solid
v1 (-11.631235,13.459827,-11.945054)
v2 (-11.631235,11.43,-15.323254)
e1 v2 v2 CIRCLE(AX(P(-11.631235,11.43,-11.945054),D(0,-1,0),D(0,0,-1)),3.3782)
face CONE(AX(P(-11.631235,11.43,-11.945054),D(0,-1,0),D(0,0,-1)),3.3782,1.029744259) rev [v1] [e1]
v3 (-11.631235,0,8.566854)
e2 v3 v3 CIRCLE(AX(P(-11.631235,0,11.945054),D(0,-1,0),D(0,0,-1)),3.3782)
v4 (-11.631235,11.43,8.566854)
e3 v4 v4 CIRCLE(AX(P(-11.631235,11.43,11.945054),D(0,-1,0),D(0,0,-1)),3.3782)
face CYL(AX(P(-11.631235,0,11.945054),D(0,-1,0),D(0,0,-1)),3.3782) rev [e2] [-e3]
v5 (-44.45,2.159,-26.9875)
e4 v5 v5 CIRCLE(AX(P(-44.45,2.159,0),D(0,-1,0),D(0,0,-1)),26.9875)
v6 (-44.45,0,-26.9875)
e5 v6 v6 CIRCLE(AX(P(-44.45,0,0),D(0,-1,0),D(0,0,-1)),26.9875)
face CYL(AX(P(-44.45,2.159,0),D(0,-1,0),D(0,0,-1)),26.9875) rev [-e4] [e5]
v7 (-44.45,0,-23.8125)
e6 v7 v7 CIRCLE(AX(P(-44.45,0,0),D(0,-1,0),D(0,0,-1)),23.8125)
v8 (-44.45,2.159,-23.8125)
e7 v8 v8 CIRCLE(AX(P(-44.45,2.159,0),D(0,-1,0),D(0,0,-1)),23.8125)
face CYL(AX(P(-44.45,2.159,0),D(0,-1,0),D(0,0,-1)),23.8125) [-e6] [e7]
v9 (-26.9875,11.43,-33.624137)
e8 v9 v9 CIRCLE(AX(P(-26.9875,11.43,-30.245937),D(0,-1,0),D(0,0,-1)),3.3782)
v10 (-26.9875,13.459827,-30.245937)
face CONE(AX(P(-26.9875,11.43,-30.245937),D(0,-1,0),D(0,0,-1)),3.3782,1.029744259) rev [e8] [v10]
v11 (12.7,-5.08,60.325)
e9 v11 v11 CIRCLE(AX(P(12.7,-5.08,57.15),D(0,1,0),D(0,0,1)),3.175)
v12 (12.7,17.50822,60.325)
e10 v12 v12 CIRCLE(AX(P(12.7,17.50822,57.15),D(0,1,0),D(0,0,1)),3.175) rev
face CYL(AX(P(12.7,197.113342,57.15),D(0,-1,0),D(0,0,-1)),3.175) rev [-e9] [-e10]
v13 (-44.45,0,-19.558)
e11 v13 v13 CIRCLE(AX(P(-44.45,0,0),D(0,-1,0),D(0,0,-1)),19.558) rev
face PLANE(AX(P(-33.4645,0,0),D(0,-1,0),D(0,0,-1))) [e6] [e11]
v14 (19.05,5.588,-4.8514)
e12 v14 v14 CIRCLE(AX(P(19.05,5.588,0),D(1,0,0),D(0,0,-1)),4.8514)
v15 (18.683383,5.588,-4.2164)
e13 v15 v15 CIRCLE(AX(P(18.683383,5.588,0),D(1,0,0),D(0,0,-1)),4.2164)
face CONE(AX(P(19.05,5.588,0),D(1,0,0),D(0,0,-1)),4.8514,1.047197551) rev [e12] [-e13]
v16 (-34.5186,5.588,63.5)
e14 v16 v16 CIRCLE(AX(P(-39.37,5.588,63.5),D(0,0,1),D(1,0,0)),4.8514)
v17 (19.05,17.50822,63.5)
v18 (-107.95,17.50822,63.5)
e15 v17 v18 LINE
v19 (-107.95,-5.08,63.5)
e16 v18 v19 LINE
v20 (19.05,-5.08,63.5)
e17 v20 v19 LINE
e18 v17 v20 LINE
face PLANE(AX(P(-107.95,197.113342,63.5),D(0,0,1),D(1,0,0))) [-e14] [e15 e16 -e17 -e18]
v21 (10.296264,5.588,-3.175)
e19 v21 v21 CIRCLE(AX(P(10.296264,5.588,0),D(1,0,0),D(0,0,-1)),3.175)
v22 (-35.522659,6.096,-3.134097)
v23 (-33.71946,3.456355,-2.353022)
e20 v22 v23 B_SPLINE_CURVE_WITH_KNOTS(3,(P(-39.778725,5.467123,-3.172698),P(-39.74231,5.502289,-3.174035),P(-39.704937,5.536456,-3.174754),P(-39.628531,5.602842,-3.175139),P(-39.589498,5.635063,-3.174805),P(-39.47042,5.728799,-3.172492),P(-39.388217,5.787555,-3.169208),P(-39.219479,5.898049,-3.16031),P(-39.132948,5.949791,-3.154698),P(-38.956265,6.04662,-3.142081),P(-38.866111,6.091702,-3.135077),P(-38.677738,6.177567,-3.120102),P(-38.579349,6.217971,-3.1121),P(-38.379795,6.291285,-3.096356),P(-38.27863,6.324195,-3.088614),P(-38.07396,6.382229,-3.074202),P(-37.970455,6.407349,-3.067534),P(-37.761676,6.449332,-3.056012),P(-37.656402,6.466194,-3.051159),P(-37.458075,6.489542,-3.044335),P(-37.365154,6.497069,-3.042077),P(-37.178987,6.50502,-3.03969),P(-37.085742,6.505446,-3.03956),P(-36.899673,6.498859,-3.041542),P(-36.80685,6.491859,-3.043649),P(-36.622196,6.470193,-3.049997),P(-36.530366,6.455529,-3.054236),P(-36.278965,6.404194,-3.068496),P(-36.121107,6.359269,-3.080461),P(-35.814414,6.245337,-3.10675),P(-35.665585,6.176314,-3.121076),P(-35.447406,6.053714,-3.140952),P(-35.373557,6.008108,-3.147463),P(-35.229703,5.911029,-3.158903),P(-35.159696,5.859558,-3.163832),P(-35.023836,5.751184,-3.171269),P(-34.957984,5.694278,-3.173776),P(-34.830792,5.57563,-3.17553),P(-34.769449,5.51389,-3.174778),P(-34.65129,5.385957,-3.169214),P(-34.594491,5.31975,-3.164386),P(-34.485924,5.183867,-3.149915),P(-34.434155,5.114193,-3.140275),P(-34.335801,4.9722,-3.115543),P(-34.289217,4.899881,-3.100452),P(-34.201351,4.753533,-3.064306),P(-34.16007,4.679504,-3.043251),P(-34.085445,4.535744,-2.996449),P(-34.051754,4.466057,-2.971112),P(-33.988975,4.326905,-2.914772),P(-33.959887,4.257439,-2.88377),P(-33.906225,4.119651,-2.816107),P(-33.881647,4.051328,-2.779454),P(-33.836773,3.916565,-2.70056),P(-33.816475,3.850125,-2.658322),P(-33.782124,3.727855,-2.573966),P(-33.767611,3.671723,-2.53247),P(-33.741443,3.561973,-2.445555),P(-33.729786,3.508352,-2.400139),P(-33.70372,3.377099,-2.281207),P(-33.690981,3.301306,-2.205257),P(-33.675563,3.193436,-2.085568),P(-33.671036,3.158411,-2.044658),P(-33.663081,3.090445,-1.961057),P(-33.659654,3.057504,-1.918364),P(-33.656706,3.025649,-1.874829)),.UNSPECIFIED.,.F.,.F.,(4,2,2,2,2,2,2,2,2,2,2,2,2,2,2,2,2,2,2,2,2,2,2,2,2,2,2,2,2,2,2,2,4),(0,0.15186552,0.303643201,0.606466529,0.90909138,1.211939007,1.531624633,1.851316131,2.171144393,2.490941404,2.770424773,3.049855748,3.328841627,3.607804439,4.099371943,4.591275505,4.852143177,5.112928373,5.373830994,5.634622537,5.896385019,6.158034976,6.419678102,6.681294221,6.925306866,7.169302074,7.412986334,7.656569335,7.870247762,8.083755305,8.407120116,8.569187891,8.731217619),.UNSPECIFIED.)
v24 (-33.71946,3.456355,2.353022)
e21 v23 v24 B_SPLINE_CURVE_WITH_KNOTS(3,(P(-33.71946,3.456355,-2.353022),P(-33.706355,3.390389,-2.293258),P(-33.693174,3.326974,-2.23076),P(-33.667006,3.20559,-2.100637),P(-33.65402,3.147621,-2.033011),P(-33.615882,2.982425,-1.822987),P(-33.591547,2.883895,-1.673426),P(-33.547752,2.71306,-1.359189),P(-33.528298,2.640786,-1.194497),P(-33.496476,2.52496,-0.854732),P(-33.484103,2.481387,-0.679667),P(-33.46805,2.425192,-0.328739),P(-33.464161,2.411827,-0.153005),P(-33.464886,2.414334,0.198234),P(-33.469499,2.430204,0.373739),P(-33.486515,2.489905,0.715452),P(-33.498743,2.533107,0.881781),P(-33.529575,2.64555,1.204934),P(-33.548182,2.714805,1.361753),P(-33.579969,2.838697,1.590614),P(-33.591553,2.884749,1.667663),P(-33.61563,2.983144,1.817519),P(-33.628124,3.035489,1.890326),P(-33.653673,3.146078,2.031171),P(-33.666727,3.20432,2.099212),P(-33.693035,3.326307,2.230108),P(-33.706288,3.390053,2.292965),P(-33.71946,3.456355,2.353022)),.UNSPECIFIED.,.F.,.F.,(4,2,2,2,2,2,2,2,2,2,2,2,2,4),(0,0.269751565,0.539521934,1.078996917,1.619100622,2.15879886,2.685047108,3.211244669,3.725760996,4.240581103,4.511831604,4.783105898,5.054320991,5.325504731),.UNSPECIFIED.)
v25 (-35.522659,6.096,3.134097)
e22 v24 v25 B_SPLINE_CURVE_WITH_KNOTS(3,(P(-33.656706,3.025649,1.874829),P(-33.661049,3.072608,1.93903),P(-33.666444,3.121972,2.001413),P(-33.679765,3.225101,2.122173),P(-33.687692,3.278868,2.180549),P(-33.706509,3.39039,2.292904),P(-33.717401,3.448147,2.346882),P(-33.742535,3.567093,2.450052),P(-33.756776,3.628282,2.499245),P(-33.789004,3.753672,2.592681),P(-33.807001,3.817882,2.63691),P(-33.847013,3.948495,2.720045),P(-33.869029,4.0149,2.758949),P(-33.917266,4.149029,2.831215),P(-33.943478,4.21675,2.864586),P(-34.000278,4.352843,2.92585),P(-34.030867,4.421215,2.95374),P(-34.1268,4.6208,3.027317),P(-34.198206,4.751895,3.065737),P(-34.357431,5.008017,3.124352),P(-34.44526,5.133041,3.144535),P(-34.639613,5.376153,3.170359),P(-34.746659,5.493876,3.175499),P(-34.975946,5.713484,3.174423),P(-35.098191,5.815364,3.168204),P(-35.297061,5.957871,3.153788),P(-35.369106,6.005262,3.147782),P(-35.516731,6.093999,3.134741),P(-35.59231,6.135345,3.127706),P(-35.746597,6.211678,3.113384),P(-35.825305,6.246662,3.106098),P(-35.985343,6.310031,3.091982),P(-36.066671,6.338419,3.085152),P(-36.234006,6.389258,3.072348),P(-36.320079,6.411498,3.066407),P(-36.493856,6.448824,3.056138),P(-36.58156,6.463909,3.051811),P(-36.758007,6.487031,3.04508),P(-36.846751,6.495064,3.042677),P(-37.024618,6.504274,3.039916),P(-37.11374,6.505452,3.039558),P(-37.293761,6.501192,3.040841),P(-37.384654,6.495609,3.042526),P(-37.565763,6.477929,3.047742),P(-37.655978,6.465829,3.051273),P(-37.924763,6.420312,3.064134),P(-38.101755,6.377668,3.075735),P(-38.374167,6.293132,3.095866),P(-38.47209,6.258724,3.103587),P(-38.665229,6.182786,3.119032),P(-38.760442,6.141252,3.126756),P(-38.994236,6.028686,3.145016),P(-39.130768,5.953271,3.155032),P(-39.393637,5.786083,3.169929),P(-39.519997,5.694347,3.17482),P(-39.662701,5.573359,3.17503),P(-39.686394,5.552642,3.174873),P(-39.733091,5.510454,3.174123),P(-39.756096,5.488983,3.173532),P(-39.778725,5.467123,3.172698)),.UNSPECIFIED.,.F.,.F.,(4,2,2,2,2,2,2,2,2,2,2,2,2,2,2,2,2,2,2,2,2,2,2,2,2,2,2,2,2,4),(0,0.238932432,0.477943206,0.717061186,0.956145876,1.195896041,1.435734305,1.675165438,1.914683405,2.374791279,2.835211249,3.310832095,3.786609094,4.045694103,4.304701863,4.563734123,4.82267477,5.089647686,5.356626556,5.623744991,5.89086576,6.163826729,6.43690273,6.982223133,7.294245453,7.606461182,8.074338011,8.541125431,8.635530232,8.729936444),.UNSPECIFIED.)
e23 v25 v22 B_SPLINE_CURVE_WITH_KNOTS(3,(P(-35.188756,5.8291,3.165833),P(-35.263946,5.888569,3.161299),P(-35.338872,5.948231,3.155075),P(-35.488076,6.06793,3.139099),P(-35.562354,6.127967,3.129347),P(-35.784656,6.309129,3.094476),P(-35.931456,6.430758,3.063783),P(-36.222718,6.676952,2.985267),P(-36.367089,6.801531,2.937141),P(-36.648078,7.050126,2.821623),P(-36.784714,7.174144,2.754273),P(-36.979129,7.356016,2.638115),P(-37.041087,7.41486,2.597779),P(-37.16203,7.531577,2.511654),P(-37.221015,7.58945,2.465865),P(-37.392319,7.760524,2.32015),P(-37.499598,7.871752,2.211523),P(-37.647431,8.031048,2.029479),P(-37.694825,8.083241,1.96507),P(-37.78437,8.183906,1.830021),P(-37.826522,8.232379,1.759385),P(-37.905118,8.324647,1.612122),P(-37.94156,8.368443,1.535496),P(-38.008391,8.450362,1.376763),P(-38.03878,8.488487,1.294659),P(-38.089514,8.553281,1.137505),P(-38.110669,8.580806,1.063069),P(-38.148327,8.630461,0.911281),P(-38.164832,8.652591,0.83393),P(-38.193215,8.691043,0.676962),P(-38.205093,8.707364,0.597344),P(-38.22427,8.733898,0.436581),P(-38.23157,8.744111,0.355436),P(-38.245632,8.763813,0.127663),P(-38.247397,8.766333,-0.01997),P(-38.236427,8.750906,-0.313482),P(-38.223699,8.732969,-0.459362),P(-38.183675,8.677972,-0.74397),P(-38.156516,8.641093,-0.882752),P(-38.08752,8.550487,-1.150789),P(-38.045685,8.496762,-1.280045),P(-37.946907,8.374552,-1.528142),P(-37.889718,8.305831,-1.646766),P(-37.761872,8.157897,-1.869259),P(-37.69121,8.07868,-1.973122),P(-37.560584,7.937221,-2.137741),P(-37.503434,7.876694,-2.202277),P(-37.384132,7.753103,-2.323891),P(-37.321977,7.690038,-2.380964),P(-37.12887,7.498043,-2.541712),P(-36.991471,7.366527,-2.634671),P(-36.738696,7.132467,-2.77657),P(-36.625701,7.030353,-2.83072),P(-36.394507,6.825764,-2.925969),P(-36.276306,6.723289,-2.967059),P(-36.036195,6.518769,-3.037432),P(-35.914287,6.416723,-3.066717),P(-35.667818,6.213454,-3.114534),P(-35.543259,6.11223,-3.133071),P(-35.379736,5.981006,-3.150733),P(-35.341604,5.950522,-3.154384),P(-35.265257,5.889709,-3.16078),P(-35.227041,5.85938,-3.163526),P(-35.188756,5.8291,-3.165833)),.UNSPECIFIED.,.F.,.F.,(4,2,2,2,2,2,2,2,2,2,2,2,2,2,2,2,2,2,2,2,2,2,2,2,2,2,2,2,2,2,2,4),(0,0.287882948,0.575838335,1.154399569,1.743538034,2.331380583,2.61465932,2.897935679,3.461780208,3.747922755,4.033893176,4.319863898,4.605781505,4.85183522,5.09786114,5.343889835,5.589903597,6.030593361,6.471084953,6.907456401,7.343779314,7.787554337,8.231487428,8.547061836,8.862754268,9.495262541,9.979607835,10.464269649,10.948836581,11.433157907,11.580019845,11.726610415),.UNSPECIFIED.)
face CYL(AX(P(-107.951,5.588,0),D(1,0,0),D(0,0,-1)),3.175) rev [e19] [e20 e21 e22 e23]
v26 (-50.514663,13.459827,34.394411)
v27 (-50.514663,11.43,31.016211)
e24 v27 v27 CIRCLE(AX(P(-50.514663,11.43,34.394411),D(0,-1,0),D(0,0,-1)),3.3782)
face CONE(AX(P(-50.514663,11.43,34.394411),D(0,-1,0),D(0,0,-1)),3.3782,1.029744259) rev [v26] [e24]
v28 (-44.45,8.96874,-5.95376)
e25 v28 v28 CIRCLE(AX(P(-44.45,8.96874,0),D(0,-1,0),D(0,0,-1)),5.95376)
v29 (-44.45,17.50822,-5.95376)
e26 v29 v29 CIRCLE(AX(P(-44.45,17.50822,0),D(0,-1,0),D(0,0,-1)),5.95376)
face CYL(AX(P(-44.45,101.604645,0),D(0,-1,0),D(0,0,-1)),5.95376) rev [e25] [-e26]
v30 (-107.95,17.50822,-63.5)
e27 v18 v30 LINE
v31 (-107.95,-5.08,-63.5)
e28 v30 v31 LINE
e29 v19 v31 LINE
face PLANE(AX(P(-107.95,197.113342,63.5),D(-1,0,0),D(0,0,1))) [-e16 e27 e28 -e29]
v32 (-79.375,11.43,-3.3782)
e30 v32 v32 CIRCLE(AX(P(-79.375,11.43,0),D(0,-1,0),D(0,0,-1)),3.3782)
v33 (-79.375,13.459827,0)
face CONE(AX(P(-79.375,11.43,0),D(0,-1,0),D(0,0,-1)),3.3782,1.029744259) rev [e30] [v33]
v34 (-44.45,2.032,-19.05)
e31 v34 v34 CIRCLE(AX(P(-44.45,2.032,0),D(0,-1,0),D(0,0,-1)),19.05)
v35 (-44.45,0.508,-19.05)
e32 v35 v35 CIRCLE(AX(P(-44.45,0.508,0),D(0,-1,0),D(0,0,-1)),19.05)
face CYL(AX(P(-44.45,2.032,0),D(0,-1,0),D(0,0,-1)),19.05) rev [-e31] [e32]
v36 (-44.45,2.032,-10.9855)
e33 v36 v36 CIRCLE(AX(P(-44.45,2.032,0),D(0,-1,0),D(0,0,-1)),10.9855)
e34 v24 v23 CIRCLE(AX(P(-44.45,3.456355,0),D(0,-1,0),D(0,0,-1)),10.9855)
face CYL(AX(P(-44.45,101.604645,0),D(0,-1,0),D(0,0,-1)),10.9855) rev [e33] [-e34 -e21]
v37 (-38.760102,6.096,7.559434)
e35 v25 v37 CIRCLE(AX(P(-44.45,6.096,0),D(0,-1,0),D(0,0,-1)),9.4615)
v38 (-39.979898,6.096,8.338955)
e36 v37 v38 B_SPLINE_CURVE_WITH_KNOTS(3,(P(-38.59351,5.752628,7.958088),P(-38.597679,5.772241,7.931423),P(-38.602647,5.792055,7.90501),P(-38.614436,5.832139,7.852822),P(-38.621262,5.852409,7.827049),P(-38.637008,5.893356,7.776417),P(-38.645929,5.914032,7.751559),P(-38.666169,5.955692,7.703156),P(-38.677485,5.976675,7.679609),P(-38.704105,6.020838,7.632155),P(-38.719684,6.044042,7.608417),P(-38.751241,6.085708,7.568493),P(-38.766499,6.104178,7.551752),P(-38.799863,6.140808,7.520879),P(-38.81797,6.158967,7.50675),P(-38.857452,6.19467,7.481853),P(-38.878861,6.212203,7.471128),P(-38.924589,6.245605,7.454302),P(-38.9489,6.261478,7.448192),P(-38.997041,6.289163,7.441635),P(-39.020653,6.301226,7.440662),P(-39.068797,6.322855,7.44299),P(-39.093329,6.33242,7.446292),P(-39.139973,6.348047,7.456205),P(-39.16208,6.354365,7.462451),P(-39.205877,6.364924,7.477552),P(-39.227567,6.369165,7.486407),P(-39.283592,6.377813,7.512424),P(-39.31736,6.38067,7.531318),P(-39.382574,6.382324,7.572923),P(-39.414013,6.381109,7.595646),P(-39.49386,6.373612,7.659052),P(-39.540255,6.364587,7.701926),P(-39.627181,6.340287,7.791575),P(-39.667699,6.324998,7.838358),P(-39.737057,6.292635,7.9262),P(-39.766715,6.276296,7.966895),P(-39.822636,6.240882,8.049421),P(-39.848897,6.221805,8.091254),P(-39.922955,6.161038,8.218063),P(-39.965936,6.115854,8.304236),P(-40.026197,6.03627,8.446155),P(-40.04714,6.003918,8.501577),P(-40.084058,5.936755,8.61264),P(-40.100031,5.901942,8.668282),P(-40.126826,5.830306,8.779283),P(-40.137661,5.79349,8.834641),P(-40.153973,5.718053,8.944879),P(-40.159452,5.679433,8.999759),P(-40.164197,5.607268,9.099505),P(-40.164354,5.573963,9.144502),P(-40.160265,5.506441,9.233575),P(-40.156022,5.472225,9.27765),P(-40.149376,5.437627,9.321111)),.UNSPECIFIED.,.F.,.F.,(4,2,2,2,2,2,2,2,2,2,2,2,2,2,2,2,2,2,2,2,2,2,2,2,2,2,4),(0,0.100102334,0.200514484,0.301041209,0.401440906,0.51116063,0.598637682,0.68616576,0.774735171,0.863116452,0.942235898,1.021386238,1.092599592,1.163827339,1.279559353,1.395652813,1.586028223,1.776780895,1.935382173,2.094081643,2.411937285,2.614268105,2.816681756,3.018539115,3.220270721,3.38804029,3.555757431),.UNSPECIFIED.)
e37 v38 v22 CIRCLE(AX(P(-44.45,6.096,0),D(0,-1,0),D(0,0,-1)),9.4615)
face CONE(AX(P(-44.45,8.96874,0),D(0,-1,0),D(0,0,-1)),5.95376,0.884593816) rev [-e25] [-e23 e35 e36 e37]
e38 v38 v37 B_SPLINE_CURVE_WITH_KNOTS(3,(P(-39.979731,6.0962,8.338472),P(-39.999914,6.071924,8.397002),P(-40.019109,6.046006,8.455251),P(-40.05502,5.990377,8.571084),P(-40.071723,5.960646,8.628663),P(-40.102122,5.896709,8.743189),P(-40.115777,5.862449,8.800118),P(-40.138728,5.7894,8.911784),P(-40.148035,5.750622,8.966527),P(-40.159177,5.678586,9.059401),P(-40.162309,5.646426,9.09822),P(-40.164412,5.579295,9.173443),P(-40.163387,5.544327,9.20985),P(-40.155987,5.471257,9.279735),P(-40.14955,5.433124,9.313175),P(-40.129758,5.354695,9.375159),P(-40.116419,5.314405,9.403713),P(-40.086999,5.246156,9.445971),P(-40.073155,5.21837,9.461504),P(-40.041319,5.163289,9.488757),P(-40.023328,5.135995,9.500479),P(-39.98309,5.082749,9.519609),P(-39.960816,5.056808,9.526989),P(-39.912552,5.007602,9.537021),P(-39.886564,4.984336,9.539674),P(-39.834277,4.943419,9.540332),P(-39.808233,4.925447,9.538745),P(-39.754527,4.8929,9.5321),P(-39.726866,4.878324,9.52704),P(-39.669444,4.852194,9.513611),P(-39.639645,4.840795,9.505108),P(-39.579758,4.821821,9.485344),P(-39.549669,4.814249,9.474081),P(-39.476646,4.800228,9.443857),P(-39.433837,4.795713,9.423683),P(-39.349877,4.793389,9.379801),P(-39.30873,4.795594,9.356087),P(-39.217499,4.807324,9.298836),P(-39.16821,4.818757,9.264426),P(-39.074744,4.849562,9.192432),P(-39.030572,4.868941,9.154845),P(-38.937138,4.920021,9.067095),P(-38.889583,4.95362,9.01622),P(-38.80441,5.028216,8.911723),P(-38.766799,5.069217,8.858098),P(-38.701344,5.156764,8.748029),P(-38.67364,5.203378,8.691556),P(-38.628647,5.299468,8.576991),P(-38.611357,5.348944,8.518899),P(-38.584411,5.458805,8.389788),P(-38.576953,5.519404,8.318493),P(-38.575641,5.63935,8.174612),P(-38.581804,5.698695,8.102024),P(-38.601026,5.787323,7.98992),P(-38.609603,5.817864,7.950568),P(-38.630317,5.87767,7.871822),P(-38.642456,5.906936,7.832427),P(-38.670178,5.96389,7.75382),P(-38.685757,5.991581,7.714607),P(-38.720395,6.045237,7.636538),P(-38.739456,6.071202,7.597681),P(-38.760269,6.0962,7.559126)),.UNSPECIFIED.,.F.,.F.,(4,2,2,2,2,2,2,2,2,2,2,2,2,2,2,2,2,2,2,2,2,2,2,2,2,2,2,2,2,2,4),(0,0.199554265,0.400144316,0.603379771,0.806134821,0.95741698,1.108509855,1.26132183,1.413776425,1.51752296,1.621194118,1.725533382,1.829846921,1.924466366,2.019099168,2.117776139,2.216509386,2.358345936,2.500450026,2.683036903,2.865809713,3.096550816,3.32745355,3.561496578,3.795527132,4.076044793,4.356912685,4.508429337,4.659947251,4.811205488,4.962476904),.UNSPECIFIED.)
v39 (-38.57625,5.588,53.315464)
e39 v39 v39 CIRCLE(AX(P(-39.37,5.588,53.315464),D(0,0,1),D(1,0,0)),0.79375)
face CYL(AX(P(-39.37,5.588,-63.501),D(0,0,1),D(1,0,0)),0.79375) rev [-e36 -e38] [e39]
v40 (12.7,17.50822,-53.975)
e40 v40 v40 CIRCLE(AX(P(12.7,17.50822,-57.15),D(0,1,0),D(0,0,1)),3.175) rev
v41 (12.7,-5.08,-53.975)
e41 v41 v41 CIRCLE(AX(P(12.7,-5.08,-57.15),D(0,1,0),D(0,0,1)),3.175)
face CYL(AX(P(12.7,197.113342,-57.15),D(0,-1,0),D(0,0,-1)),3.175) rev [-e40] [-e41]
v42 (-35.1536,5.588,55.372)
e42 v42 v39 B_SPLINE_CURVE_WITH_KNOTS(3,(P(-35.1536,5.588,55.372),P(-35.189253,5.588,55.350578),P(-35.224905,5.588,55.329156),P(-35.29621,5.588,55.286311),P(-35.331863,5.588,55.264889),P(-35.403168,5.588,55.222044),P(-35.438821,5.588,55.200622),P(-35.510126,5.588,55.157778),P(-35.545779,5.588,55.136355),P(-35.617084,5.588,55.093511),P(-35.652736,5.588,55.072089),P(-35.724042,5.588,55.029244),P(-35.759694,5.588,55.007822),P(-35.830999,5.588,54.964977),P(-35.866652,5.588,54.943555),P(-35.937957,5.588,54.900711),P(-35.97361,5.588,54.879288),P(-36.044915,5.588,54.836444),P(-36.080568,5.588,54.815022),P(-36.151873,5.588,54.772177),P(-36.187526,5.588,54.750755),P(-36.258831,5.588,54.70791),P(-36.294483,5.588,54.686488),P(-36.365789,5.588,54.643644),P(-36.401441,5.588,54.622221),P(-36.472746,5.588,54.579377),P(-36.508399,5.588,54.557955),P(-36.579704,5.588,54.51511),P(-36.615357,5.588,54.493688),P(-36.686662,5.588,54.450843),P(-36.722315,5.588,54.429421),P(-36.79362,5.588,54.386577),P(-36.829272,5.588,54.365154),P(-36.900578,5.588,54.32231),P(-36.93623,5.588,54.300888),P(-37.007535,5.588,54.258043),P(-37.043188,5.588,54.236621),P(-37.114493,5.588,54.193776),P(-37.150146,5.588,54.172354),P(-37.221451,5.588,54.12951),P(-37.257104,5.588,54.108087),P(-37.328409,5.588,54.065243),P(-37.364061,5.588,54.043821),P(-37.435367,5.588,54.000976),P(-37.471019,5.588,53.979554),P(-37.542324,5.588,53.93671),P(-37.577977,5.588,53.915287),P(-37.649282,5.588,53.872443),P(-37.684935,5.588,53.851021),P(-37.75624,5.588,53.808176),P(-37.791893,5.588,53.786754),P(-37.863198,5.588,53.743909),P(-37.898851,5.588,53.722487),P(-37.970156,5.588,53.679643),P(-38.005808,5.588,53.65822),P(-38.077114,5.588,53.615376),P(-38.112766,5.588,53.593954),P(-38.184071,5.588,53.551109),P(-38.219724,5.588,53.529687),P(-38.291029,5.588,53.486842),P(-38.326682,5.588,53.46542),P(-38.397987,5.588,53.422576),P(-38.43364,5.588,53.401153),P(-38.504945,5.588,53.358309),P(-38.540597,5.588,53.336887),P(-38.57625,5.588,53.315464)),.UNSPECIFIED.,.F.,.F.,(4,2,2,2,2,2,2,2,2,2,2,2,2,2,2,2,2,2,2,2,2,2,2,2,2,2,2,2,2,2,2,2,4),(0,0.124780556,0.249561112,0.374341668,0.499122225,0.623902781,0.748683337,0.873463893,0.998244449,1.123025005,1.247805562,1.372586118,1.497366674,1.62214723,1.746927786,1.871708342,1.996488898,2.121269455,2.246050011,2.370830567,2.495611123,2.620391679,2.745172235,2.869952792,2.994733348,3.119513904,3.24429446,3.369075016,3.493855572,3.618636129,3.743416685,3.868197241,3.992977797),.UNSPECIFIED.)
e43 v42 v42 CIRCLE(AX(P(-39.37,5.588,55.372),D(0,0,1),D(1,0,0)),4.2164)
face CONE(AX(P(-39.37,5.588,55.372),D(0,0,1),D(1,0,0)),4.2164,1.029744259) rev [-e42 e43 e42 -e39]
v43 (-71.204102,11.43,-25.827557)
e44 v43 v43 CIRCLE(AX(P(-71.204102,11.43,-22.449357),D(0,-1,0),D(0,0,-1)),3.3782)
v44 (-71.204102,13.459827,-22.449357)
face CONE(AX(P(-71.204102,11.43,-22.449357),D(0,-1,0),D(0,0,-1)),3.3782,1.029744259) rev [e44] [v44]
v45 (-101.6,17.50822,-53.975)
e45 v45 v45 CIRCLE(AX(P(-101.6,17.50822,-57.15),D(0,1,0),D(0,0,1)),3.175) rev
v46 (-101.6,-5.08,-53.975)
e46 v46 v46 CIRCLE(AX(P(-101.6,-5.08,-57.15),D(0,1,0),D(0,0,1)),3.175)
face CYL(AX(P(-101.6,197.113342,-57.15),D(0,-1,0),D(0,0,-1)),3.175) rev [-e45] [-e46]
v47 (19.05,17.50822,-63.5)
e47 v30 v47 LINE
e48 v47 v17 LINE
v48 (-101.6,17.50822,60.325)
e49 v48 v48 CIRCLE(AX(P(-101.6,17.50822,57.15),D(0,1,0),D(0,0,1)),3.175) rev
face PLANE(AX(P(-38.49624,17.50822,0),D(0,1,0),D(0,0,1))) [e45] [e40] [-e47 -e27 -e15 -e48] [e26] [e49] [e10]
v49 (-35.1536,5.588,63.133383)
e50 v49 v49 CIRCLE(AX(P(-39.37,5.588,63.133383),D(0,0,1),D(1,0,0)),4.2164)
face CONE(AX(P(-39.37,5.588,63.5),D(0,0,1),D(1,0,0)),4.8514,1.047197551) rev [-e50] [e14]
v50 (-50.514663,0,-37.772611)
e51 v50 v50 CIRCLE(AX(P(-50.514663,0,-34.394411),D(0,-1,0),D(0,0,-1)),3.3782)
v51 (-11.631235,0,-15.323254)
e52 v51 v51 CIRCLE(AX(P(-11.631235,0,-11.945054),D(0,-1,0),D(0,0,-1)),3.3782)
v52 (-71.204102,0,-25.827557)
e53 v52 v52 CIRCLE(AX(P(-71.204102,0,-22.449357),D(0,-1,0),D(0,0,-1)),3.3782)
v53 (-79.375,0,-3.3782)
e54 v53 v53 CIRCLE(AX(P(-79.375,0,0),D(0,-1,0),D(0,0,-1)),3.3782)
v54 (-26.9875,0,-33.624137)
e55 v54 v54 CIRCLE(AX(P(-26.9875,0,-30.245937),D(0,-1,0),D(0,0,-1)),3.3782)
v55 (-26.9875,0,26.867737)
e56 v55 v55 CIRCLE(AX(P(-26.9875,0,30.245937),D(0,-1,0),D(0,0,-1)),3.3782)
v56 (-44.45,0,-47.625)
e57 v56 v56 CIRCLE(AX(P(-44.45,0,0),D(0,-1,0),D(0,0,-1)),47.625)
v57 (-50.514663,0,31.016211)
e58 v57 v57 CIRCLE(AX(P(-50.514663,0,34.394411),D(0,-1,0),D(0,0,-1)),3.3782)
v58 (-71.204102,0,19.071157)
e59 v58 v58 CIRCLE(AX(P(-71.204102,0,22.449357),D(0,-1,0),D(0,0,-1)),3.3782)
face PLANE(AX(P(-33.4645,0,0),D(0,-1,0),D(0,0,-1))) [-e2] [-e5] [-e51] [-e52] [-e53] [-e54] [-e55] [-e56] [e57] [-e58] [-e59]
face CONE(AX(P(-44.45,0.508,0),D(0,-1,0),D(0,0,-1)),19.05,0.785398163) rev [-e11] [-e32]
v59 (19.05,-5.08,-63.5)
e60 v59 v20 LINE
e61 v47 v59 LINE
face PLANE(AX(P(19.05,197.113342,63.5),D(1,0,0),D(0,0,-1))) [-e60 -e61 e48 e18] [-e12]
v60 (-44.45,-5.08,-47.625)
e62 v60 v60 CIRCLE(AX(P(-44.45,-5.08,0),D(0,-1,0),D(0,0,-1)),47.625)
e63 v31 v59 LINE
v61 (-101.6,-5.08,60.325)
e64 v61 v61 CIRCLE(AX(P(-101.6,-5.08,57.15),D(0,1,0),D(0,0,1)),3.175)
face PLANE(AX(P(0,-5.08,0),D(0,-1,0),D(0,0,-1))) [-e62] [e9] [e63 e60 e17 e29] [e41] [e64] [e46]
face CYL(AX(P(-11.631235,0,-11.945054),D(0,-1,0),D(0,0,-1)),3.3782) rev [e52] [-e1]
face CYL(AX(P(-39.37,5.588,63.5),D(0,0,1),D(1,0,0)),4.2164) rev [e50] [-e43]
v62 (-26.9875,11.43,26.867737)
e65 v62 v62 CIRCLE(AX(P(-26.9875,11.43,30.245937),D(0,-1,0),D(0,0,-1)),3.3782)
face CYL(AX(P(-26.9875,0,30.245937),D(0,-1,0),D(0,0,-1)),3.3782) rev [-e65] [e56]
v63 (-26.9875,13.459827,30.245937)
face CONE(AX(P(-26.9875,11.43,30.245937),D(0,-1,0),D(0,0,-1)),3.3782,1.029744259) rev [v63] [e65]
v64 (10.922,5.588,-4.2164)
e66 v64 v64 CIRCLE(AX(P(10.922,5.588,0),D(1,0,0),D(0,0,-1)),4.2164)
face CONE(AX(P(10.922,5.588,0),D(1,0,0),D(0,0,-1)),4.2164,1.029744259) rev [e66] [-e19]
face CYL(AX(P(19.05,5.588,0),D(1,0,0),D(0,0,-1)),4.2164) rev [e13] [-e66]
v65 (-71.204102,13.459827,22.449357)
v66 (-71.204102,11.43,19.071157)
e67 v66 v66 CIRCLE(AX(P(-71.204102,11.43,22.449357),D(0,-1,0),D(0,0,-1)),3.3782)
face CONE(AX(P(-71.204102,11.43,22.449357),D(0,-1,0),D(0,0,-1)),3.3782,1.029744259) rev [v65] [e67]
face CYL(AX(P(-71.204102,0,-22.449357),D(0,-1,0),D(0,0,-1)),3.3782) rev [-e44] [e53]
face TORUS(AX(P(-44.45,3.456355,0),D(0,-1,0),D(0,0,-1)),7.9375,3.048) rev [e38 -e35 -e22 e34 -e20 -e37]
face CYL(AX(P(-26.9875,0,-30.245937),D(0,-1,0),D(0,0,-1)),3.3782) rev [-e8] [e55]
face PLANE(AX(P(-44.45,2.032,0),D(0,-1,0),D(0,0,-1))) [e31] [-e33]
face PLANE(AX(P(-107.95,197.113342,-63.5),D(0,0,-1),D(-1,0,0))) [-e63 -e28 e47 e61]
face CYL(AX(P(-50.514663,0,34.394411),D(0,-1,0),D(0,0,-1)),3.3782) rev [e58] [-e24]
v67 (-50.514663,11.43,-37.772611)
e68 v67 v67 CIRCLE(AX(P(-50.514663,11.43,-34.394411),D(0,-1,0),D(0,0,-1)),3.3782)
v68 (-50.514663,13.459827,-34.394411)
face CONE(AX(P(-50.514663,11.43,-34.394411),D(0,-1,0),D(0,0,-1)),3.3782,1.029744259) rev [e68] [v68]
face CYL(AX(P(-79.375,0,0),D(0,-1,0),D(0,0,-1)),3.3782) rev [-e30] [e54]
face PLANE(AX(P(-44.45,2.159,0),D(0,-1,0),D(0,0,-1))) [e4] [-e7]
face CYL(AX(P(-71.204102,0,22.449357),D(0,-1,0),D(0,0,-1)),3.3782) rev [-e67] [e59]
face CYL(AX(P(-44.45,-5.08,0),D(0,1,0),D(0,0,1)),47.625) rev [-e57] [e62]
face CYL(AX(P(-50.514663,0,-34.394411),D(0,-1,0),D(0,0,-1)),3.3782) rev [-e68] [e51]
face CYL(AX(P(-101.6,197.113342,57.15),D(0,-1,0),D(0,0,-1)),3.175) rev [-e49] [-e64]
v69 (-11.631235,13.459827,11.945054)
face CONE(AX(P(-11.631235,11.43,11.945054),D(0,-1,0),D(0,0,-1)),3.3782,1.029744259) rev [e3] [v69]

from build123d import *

# Parameters (mm, degrees)
SKETCH5_W                = 127
SKETCH5_H                = 127
SKETCH5_R                = 38.1
SKETCH5_R_2              = 3.175
BOSS_EXTRUDE2_DEPTH      = 17.50822
CUT_EXTRUDE5_REACH       = 145.066
SKETCH8_R                = 3.175
CUT_EXTRUDE9_REACH       = 169.597
SKETCH10_R               = 0.79375
SKETCH11_W               = 127
SKETCH11_H               = 127
SKETCH11_R               = 47.625
BOSS_EXTRUDE3_DEPTH      = 5.08
SKETCH12_R               = 26.9875
SKETCH12_R_2             = 23.8125
CUT_EXTRUDE10_DEPTH      = 2.159
CUT_EXTRUDE12_DEPTH      = 128.262249687
CUT_EXTRUDE12_DEPTH_BACK = 128.262249687
SKETCH14_R               = 3.175
SKETCH15_R               = 19.05
CUT_EXTRUDE13_DEPTH      = 2.032
CIRPATTERN1_COUNT        = 9
CHAMFER1_SIZE            = 0.508


# Read off the part's stored shape, not the designer's step: Q (0.332) Diameter Hole1
with BuildPart() as part:
    # Sketch1 → Revolve1 (revolve)
    with BuildSketch(Plane.XY, mode=Mode.PRIVATE) as revolve1_sk:
        with BuildLine():
            Line((-38.49624, 17.50822), (0, 17.50822))
            Line((0, 17.50822), (0, 0))
            Line((0, 0), (-33.4645, 0))
            Line((-33.4645, 0), (-33.4645, 3.456354569))
            ThreePointArc((-33.4645, 3.456354569), (-33.872854569, 4.980354569), (-34.9885, 6.096))
            Line((-34.9885, 6.096), (-38.49624, 8.96874))
            Line((-38.49624, 8.96874), (-38.49624, 17.50822))
        make_face()
    revolve(revolve1_sk.sketch.rotate(Axis((-44.45, 101.60464546, 0), (0, 1, 0)), 90), axis=Axis((-44.45, 101.60464546, 0), (0, 1, 0)))

    # Sketch5 → Boss-Extrude2 (add)
    with BuildSketch(Plane.XZ):
        with Locations((-44.45, 0)):
            Rectangle(SKETCH5_W, SKETCH5_H)
        with Locations((-44.45, 0)):
            Circle(SKETCH5_R, mode=Mode.SUBTRACT)
        with Locations(Location((-101.6, 57.15, 0), (0, 0, 270))):
            Circle(SKETCH5_R_2, mode=Mode.SUBTRACT)
        with Locations(Location((12.7, 57.15, 0), (0, 0, 90))):
            Circle(SKETCH5_R_2, mode=Mode.SUBTRACT)
        with Locations(Location((12.7, -57.15, 0), (0, 0, 270))):
            Circle(SKETCH5_R_2, mode=Mode.SUBTRACT)
        with Locations(Location((-101.6, -57.15, 0), (0, 0, 90))):
            Circle(SKETCH5_R_2, mode=Mode.SUBTRACT)
    extrude(amount=-BOSS_EXTRUDE2_DEPTH)

    # Sketch8 → Cut-Extrude5 (cut, up to next)
    with BuildSketch(Plane(origin=(19.05, 0, 0), x_dir=(0, 0, -1), z_dir=(1, 0, 0)), mode=Mode.PRIVATE) as cut_extrude5_sk1:
        with Locations((0, 5.588)):
            Circle(SKETCH8_R)
    cut_extrude5_tool1 = extrude(cut_extrude5_sk1.sketch, amount=-CUT_EXTRUDE5_REACH, mode=Mode.PRIVATE) & part.part
    add(cut_extrude5_tool1.solids().sort_by_distance((19.05, 5.588, 0))[0], mode=Mode.SUBTRACT)

    # Sketch10 → Cut-Extrude9 (cut, up to next)
    with BuildSketch(Plane.XY.offset(63.5), mode=Mode.PRIVATE) as cut_extrude9_sk1:
        with Locations((-39.37, 5.588)):
            Circle(SKETCH10_R)
    cut_extrude9_tool1 = extrude(cut_extrude9_sk1.sketch, amount=-CUT_EXTRUDE9_REACH, mode=Mode.PRIVATE) & part.part
    add(cut_extrude9_tool1.solids().sort_by_distance((-39.37, 5.588, 63.5))[0], mode=Mode.SUBTRACT)

    # Sketch11 → Boss-Extrude3 (add)
    with BuildSketch(Plane.XZ):
        with Locations((-44.45, 0)):
            Rectangle(SKETCH11_W, SKETCH11_H)
        with Locations(Location((-44.45, 0, 0), (0, 0, 270))):
            Circle(SKETCH11_R, mode=Mode.SUBTRACT)
    extrude(amount=BOSS_EXTRUDE3_DEPTH)

    # Sketch12 → Cut-Extrude10 (cut)
    with BuildSketch(Plane.XZ):
        with Locations(Location((-44.45, 0, 0), (0, 0, 270))):
            Circle(SKETCH12_R)
        with Locations(Location((-44.45, 0, 0), (0, 0, 270))):
            Circle(SKETCH12_R_2, mode=Mode.SUBTRACT)
    extrude(amount=-CUT_EXTRUDE10_DEPTH, mode=Mode.SUBTRACT)

    # Sketch14 → Cut-Extrude12 (cut, two sides: drawn at the far end of the back side and taken through both)
    with BuildSketch(Plane(origin=(0, 17.50822, 0), x_dir=(1, 0, 0), z_dir=(0, 1, 0)).offset(-CUT_EXTRUDE12_DEPTH_BACK)):
        with Locations(Location((-101.6, 57.15, 0), (0, 0, 270))):
            Circle(SKETCH14_R)
        with Locations(Location((12.7, 57.15, 0), (0, 0, 270))):
            Circle(SKETCH14_R)
        with Locations(Location((12.7, -57.15, 0), (0, 0, 270))):
            Circle(SKETCH14_R)
        with Locations(Location((-101.6, -57.15, 0), (0, 0, 270))):
            Circle(SKETCH14_R)
    extrude(amount=CUT_EXTRUDE12_DEPTH + CUT_EXTRUDE12_DEPTH_BACK, mode=Mode.SUBTRACT)

    # Sketch15 → Cut-Extrude13 (cut)
    with BuildSketch(Plane.XZ):
        with Locations(Location((-44.45, 0, 0), (0, 0, 270))):
            Circle(SKETCH15_R)
    extrude(amount=-CUT_EXTRUDE13_DEPTH, mode=Mode.SUBTRACT)

    # Sketch19 → Tapped Hole for 1/4-20 Helicoil2 (revolve, cut)
    with BuildSketch(Plane(origin=(-79.375, 0, 0), x_dir=(0, 0, -1), z_dir=(1, 0, 0))):
        Polygon((0, 0), (0, 13.459827343), (3.3782, 11.43), (3.3782, 0), align=None)
    tapped_hole_for_1_4_20_helicoil2 = revolve(axis=Axis((-79.375, -6.35, 0), (0, 1, 0)), mode=Mode.SUBTRACT)

    # CirPattern1: Tapped Hole for 1/4-20 Helicoil2 ×9 about axis
    cirpattern1_axis = Axis((-44.45, 0, 0), (0, 1, 0))
    for i in range(1, CIRPATTERN1_COUNT):
        add(tapped_hole_for_1_4_20_helicoil2.rotate(cirpattern1_axis, i * 360 / CIRPATTERN1_COUNT), mode=Mode.SUBTRACT)

    # Chamfer1
    chamfer1_edges = [part.edges().sort_by_distance(p)[0] for p in [
        (-44.45, 0, 19.05),
    ]]
    chamfer(chamfer1_edges, length=CHAMFER1_SIZE)

    # Q (0.332) Diameter Hole1 outline → Q (0.332) Diameter Hole1 (revolve, cut)
    with BuildSketch(Plane(origin=(-39.37, 5.588, 0), x_dir=(1, 0, 0), z_dir=(0, -1, 0))):
        Polygon((0.79375, 63.5), (0.79375, 53.315464402), (4.2164, 55.372), (4.2164, 63.133382579), (4.8514, 63.5), align=None)
    revolve(axis=Axis((-39.37, 5.588, 0), (0, 0, 1)), mode=Mode.SUBTRACT)

    # Q _0.332_ Diameter Hole1 2 outline → Q _0.332_ Diameter Hole1 2 (revolve, cut)
    with BuildSketch(Plane(origin=(0, 5.588, 0), x_dir=(0, 1, 0), z_dir=(0, 0, -1))):
        Polygon((3.175, 19.05), (3.175, 10.296263751), (4.2164, 10.922), (4.2164, 18.683382579), (4.8514, 19.05), align=None)
    revolve(axis=Axis((0, 5.588, 0), (1, 0, 0)), mode=Mode.SUBTRACT)


solid = part.part
